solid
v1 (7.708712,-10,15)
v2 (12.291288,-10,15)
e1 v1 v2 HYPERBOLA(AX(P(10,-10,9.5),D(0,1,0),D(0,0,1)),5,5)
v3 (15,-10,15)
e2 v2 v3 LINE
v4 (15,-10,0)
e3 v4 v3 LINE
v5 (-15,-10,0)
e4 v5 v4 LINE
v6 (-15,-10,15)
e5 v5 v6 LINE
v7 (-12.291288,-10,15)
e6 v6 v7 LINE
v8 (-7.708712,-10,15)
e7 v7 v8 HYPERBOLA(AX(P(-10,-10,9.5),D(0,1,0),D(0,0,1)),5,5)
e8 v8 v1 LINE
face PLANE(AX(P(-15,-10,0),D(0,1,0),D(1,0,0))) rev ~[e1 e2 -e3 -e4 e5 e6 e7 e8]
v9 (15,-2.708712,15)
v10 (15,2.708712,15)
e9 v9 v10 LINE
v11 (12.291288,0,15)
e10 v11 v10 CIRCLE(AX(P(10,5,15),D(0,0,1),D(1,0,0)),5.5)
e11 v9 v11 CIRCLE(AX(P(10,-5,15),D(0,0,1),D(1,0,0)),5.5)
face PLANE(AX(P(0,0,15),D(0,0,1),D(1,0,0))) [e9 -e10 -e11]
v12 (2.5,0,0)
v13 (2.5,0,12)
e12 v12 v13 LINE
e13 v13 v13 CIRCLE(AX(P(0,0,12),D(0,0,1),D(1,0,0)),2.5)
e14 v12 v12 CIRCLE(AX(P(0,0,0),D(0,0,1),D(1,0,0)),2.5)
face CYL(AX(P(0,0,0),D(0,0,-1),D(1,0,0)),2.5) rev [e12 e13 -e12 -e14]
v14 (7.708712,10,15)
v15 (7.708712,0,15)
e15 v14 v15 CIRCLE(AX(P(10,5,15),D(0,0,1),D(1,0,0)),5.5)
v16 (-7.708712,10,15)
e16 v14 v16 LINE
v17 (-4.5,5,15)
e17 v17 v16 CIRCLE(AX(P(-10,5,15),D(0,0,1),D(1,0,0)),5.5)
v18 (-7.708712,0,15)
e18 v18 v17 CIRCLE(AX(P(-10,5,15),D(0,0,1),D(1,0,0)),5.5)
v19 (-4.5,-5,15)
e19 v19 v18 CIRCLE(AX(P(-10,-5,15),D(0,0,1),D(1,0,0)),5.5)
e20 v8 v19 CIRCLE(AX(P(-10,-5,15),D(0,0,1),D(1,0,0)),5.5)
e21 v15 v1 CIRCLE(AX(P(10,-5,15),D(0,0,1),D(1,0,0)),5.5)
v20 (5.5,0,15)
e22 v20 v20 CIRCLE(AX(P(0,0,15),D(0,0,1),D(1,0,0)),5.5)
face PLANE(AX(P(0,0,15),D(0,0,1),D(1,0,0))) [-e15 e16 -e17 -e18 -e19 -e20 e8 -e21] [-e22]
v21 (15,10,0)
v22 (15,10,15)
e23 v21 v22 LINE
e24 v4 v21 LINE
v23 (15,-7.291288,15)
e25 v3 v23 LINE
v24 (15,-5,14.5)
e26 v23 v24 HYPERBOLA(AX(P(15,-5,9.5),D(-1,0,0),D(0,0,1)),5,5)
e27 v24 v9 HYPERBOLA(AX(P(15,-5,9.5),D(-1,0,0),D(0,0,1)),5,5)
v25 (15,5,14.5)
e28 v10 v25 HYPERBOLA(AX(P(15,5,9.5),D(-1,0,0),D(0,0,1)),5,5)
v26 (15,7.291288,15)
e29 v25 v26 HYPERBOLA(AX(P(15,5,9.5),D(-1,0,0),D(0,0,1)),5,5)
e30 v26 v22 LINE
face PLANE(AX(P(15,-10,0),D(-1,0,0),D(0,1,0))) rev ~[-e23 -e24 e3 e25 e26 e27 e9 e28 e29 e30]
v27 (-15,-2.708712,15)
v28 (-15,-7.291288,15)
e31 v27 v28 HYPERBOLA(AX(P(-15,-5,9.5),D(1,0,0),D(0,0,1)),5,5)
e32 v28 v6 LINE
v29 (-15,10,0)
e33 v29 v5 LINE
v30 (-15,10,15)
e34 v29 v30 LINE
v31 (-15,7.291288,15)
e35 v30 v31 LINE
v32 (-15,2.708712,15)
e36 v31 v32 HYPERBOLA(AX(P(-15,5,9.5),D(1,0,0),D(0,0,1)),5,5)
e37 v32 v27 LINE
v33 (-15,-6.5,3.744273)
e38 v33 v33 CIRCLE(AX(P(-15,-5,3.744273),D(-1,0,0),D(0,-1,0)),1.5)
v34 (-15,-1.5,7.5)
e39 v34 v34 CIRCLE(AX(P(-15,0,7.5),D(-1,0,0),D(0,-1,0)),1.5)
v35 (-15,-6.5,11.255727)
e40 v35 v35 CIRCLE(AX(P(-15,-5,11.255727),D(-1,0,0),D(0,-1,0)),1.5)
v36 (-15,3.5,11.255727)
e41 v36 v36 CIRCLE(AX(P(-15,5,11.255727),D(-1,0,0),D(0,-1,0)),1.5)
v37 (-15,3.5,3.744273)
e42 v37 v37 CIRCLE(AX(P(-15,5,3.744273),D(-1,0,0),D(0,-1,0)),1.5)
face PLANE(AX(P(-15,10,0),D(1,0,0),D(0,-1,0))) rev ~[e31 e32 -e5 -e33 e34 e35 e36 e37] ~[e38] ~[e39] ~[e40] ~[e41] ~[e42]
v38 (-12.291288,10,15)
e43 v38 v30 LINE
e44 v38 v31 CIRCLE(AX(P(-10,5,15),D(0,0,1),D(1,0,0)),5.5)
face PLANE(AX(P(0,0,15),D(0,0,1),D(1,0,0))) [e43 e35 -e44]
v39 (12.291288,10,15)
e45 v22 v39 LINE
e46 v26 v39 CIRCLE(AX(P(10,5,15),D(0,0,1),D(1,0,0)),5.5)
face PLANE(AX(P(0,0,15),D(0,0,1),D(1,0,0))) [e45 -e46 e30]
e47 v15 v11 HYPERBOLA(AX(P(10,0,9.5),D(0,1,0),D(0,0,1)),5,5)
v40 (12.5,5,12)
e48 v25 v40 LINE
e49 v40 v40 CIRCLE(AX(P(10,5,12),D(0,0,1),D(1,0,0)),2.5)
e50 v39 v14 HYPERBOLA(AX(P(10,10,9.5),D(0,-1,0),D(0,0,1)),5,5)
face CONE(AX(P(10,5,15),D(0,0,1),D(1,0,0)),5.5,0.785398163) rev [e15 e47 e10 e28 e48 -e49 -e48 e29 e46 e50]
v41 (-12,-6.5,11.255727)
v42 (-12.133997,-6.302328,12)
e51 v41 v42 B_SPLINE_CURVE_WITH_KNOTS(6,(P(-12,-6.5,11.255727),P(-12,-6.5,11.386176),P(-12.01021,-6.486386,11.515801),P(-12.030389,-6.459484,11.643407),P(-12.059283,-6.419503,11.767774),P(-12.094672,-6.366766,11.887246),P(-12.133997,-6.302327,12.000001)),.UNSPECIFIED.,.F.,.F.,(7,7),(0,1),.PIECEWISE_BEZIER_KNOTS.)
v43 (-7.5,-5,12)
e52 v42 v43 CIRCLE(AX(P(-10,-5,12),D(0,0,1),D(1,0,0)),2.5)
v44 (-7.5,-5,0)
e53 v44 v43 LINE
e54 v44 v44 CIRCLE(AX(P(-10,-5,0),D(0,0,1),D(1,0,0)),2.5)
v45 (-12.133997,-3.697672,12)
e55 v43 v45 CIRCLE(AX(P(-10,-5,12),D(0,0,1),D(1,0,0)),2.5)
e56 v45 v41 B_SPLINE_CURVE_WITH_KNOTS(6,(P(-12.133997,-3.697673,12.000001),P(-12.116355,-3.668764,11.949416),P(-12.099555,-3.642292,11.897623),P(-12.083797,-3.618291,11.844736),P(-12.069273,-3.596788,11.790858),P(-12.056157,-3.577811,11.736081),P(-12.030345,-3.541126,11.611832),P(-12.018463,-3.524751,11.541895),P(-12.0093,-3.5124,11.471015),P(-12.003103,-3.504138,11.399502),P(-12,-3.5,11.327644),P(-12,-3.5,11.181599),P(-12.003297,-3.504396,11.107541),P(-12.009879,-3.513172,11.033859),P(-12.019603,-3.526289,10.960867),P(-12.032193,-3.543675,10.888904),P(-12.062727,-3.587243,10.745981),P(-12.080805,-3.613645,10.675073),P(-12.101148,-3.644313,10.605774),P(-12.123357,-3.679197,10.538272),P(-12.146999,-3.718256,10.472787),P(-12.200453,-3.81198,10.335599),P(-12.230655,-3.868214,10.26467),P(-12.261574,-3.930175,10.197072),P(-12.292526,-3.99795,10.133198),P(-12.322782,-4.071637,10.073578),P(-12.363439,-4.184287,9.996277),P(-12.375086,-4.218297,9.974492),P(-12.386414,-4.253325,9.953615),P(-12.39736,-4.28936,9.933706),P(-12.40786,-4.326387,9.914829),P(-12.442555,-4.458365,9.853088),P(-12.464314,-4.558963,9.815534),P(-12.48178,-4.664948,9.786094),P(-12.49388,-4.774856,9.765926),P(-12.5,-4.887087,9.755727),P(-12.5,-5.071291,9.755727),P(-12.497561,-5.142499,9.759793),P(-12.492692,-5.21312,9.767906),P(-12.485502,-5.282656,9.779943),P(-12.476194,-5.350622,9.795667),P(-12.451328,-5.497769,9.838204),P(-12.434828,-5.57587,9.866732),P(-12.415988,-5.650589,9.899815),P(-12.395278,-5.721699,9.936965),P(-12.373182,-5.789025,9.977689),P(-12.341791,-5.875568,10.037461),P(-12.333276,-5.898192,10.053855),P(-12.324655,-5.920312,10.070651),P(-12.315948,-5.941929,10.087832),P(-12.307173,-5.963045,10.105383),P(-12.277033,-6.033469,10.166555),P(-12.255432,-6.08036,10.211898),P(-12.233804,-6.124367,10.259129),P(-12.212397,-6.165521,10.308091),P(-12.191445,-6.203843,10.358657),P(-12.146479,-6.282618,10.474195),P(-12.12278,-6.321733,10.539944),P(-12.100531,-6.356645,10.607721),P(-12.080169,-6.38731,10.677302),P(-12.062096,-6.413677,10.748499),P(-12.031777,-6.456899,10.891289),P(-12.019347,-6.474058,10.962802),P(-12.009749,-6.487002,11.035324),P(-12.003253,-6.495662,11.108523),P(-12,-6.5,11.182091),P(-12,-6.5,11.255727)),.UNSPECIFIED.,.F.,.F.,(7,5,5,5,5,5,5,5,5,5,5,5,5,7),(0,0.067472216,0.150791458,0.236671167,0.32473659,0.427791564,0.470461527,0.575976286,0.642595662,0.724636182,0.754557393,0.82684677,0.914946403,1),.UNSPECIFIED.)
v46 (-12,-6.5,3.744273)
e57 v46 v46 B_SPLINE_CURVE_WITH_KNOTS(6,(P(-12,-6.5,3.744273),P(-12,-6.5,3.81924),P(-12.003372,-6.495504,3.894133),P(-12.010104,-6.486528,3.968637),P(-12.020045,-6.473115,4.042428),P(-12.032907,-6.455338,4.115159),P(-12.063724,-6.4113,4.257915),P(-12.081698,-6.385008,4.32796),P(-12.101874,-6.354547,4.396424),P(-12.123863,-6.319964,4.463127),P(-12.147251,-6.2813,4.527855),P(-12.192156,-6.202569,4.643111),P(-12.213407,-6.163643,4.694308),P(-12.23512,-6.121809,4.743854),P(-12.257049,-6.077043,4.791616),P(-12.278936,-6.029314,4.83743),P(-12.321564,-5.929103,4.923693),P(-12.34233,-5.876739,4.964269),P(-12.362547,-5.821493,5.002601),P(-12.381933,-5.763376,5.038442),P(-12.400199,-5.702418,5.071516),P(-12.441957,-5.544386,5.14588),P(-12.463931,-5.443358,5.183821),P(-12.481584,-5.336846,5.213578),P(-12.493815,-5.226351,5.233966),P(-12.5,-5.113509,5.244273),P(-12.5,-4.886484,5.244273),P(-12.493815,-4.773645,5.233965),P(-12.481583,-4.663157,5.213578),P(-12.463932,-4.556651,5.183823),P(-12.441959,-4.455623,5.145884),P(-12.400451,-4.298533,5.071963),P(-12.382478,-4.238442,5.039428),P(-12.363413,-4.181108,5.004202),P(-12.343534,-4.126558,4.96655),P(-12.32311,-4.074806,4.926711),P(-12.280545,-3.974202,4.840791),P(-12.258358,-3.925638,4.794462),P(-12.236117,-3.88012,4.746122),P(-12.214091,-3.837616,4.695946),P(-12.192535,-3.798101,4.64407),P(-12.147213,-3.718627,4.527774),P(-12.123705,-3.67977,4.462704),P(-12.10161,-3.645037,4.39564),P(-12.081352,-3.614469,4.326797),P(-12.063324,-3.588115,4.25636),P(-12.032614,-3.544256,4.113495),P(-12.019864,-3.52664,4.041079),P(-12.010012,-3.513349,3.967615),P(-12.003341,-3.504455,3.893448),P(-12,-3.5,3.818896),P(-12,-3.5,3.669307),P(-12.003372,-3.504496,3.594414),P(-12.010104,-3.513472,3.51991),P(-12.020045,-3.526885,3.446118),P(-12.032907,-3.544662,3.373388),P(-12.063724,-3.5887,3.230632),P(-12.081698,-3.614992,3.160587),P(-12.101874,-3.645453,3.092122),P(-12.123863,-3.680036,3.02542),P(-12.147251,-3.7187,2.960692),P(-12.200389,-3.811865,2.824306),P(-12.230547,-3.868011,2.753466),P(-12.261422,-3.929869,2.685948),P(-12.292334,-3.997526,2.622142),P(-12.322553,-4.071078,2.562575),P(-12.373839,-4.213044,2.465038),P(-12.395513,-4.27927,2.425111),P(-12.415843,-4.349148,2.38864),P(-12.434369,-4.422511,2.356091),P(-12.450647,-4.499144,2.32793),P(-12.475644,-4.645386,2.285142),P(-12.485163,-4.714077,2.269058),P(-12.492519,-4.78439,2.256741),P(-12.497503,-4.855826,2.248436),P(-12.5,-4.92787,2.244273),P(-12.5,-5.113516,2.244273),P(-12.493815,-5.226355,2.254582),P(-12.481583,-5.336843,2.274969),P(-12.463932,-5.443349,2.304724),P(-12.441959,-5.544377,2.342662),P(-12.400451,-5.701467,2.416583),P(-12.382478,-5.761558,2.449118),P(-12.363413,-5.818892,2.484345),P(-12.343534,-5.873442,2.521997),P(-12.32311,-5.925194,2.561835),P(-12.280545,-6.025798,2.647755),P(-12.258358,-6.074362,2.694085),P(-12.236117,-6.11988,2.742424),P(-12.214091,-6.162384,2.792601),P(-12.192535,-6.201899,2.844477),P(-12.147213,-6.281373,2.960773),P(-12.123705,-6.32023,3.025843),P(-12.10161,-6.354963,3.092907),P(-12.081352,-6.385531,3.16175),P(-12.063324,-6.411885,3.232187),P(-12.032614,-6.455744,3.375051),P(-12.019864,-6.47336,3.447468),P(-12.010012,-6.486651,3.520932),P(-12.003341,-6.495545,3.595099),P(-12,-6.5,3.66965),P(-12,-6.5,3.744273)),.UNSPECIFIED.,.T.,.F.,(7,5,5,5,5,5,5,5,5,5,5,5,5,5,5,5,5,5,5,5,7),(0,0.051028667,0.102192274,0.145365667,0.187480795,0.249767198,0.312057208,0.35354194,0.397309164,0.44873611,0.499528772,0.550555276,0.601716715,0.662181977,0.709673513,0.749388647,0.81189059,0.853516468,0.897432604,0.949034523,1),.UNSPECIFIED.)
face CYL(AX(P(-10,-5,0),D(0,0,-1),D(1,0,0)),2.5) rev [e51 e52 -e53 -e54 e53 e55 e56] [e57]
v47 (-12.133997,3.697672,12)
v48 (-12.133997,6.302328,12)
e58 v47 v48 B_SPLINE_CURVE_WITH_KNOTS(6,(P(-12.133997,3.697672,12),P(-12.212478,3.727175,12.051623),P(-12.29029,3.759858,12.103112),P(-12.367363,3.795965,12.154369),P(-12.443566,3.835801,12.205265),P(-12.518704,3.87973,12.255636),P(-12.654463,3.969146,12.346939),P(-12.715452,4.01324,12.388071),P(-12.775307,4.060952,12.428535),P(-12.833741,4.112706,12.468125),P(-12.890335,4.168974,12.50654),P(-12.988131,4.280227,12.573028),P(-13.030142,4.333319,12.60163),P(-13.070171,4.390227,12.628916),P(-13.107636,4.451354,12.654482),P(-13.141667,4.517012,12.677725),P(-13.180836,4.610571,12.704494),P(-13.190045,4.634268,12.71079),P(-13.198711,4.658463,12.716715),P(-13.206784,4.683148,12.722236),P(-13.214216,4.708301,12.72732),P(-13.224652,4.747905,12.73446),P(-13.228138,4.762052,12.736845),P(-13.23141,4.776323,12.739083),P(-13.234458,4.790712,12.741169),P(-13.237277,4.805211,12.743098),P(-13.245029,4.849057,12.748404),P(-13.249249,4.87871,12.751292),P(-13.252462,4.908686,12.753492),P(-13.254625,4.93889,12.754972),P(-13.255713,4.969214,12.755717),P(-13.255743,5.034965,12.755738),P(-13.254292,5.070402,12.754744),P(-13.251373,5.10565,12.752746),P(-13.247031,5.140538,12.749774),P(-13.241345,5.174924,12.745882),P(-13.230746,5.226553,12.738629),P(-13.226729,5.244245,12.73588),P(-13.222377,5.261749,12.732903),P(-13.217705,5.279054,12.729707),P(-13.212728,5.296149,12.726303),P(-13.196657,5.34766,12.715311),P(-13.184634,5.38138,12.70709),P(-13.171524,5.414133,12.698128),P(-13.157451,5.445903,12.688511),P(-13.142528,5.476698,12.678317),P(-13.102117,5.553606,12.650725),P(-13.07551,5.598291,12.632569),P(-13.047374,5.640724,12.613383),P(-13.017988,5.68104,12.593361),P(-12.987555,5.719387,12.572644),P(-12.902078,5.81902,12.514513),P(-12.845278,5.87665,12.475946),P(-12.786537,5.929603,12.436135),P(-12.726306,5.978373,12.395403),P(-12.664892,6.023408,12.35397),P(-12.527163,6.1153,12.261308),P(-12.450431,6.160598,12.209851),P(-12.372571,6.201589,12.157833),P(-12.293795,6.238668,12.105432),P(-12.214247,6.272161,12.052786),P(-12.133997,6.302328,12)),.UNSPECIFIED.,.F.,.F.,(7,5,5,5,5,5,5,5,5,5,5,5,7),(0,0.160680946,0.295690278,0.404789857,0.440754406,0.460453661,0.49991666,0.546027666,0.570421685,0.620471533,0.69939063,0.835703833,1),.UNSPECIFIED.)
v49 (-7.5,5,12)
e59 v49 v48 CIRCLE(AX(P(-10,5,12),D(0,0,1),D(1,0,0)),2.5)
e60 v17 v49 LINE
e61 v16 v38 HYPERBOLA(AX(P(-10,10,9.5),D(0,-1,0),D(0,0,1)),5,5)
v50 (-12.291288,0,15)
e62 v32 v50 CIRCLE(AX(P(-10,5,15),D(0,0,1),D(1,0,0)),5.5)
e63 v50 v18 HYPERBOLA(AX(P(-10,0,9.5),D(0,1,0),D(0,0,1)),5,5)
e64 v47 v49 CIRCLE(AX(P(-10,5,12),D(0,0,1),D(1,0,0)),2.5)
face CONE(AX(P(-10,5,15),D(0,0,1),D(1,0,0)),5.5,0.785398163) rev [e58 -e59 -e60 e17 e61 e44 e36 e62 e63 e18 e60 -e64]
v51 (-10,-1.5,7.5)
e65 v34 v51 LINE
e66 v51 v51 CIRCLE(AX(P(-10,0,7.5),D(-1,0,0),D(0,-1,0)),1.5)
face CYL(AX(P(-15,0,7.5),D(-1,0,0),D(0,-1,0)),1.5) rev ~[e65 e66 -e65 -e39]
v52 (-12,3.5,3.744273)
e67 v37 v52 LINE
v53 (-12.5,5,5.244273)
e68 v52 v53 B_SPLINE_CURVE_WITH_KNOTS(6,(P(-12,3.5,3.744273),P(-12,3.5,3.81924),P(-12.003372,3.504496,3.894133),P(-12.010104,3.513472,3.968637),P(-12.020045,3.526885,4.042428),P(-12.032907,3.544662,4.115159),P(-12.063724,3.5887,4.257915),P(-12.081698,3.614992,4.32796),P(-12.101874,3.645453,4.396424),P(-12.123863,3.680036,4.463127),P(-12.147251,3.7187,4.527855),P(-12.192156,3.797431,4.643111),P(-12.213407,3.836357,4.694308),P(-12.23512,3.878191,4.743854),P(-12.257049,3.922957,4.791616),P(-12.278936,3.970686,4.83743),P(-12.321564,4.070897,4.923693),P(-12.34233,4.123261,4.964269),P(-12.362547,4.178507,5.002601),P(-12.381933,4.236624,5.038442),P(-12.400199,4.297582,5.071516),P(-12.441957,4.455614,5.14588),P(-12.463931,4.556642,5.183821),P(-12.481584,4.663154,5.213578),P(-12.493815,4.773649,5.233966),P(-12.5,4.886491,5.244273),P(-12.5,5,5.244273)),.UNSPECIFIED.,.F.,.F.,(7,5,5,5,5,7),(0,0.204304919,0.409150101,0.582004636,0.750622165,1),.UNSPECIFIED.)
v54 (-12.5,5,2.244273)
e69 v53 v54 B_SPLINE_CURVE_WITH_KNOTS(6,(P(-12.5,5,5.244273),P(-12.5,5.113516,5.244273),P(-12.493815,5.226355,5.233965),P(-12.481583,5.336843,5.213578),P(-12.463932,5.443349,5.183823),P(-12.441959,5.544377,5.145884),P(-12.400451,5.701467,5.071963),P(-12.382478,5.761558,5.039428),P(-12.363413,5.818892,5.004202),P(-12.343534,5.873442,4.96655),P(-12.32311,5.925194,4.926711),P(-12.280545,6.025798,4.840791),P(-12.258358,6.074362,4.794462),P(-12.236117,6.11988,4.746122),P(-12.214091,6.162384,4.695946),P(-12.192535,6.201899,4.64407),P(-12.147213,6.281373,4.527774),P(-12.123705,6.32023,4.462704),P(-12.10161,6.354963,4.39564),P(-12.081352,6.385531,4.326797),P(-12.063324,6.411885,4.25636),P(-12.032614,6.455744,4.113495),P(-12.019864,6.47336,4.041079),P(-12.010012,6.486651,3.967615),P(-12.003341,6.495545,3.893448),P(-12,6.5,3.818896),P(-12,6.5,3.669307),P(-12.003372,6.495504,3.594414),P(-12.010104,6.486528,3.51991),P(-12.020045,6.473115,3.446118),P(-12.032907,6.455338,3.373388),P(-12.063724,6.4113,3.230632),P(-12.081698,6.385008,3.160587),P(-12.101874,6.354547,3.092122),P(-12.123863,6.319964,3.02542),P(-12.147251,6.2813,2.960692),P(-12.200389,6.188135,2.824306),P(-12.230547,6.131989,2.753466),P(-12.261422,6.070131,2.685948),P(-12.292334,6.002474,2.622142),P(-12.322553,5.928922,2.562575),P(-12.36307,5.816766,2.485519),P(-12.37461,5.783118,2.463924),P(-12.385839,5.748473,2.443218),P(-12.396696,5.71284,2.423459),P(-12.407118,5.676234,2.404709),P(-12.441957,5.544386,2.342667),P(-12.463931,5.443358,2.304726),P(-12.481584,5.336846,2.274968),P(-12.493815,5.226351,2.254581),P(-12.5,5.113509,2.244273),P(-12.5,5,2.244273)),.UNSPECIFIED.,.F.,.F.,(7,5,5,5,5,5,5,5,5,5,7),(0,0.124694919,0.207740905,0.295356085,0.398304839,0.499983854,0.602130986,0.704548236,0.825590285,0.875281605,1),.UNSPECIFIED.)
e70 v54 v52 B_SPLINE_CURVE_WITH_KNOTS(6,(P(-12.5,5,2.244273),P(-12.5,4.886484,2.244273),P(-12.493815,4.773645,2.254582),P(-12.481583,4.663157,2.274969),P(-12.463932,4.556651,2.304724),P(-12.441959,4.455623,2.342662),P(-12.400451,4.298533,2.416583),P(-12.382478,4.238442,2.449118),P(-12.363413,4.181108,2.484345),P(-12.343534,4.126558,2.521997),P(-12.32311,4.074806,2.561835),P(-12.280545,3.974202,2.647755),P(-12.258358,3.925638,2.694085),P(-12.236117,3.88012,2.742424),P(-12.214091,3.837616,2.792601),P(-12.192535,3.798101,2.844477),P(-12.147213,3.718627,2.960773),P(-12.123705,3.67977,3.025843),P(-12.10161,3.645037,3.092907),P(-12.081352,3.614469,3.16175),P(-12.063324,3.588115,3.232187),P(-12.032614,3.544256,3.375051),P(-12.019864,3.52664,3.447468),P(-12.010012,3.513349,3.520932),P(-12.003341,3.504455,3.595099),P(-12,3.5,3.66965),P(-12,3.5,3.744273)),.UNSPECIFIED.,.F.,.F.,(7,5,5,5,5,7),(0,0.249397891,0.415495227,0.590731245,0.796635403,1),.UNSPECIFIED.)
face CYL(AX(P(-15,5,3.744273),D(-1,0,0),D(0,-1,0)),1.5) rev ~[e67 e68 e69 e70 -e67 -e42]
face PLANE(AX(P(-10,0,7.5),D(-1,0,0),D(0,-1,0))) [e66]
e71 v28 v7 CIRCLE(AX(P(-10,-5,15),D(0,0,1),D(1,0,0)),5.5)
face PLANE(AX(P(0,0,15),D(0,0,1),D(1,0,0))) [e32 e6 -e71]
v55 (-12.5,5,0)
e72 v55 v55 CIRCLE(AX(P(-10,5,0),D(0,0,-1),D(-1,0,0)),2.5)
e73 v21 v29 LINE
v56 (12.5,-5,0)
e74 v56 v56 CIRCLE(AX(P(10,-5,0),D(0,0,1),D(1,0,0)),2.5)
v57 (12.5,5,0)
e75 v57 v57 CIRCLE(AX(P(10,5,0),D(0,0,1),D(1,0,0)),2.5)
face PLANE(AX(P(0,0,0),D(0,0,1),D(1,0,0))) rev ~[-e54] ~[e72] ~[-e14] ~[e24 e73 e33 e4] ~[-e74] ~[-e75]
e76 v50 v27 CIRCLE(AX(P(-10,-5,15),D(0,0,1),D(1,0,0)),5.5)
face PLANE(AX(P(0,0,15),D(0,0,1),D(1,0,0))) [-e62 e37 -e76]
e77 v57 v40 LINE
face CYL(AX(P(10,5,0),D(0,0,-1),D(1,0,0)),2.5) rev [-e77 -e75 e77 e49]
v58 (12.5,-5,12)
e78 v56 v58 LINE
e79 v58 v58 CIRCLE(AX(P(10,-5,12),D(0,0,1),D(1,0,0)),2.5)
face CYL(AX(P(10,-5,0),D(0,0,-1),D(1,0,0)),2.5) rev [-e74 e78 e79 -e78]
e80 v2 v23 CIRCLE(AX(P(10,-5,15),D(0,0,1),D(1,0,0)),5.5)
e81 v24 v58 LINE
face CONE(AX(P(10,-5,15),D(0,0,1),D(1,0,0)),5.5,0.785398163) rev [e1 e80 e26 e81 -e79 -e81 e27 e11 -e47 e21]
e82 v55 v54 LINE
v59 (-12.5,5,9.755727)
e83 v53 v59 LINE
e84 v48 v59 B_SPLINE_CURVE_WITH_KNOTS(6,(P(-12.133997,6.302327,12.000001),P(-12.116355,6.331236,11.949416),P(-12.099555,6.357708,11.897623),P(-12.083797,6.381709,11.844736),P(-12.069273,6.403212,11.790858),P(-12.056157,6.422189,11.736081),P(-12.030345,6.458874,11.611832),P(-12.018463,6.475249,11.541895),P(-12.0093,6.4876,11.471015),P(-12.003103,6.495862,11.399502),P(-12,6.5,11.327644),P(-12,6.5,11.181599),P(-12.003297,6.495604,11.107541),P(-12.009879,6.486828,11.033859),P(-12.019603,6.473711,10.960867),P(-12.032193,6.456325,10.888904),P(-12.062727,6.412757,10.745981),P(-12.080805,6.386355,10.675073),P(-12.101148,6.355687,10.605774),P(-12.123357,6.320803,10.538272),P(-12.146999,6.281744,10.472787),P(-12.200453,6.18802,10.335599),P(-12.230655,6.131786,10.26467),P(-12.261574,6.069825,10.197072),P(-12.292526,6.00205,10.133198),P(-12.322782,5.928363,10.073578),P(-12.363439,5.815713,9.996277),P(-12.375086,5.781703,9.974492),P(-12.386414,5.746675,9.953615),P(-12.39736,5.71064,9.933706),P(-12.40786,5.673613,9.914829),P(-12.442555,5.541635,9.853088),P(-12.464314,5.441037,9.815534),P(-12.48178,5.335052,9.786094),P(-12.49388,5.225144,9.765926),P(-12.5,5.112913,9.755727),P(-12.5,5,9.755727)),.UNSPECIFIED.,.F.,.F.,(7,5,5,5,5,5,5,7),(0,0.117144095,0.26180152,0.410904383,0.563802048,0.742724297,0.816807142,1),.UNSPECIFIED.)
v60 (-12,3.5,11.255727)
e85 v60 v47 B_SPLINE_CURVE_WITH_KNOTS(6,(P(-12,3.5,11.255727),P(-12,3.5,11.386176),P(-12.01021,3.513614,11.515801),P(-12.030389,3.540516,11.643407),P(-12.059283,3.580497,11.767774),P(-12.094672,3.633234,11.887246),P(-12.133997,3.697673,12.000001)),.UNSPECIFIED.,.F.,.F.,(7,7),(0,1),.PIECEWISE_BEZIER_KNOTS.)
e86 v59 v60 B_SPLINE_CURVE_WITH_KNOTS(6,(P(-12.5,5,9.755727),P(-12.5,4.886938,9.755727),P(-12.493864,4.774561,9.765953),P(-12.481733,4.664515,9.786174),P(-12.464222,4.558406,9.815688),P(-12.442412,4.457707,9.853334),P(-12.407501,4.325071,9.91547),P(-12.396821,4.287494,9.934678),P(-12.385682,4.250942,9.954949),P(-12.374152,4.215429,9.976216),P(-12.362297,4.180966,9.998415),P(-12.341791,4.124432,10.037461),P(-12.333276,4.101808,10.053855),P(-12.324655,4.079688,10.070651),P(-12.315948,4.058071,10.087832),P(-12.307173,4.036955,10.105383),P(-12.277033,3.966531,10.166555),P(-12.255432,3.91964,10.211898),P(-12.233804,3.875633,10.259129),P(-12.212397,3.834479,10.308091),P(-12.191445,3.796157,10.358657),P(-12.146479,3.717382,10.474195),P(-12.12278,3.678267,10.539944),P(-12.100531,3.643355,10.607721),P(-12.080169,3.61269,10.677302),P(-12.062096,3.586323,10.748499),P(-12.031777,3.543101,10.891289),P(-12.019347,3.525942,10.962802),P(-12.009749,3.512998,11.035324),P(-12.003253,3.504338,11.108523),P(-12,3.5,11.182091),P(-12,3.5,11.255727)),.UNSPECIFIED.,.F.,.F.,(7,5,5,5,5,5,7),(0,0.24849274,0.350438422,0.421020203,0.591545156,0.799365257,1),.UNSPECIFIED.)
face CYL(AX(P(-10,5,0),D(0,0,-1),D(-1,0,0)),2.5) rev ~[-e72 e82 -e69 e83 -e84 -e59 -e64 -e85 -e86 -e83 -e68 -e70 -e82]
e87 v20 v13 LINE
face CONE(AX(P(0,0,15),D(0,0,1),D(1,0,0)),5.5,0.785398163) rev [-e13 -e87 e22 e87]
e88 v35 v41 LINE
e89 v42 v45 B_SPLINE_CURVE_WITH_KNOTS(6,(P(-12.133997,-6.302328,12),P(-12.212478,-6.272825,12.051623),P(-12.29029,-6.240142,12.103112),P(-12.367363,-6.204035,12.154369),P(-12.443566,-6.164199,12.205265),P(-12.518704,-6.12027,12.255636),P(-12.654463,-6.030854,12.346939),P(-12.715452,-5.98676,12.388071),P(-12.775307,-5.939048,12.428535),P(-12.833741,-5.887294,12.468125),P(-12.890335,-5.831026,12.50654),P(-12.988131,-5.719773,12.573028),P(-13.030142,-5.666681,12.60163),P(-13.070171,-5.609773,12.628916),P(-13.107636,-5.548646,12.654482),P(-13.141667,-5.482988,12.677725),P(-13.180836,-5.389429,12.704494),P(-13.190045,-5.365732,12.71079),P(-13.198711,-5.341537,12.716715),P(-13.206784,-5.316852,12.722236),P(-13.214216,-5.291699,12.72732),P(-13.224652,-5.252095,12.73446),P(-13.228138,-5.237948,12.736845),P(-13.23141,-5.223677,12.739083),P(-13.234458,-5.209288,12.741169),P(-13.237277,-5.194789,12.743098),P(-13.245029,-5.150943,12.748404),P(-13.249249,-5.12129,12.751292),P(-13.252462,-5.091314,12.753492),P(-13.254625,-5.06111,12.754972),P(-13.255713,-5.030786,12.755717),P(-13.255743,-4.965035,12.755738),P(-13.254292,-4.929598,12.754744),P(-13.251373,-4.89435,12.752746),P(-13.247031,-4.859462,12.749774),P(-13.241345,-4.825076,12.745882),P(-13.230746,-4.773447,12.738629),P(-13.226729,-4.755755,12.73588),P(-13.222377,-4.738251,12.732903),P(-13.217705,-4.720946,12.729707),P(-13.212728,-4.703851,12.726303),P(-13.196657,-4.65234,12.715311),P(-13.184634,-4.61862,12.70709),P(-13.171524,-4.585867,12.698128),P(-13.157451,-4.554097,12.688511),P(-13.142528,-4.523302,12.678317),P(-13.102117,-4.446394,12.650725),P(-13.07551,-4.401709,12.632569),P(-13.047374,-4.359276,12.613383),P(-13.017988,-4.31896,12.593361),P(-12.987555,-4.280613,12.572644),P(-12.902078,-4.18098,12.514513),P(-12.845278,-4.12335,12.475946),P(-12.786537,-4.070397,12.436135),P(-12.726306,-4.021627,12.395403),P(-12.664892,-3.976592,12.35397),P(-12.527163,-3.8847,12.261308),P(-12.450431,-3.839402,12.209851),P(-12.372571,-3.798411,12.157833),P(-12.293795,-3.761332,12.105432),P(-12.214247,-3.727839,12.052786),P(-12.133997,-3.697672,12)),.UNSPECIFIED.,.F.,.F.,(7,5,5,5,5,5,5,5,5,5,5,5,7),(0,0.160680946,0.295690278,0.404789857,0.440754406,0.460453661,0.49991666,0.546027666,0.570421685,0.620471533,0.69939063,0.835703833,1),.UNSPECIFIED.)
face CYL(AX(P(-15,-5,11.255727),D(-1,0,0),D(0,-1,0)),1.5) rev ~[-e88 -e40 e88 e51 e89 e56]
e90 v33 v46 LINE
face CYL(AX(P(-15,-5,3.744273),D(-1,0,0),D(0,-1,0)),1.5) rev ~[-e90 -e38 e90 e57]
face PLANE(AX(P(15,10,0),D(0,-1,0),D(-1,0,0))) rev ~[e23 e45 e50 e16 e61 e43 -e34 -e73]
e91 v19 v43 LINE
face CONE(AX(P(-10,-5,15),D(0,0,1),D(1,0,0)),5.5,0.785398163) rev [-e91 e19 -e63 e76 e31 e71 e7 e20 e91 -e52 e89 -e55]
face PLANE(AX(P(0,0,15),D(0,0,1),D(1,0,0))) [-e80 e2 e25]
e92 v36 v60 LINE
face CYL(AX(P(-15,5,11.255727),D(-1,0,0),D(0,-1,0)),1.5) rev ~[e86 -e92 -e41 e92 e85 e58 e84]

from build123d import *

# Parameters (mm, degrees)
F0_R     = 2.5
F1_DEPTH = 15
F3_R     = 1.5
F4_DEPTH = 5


# Not quite as in the source:
# - a fillet or chamfer that OpenCascade refuses, or shapes differently, is made with other operations: its cross-section is extruded or revolved along the edge and cut away or added


with BuildPart() as f1:
    # F0 (on Top) → F1 (new body)
    with BuildSketch(Plane.XY):
        Polygon((-5, 10), (-15, 10), (-15, 5), (-15, -10), (15, -10), (15, 10), align=None)
        with Locations((-10, -5)):
            Circle(F0_R, mode=Mode.SUBTRACT)
        with Locations((10, -5)):
            Circle(F0_R, mode=Mode.SUBTRACT)
        with BuildLine():
            ThreePointArc((-7.5, 5), (-10, 2.5), (-12.5, 5))
            ThreePointArc((-12.5, 5), (-10, 7.5), (-7.5, 5))
        make_face(mode=Mode.SUBTRACT)
        Circle(F0_R, mode=Mode.SUBTRACT)
        with Locations((10, 5)):
            Circle(F0_R, mode=Mode.SUBTRACT)
    extrude(amount=F1_DEPTH)

    # F2: chamfer of 3 on 5 edges, made by hand

    # F2_s1 → F2_t2 (revolve, cut)
    with BuildSketch(Plane.XZ.offset(-5)):
        Polygon((-4.5, 15), (-7.5, 12), (-7.5, 15), align=None)
    revolve(axis=Axis((-10, 5, 15), (0, 0, 1)), mode=Mode.SUBTRACT)

    # F2_s3 → F2_t4 (revolve, cut)
    with BuildSketch(Plane.XZ):
        Polygon((5.5, 15), (2.5, 12), (2.5, 15), align=None)
    revolve(axis=Axis((0, 0, 15), (0, 0, 1)), mode=Mode.SUBTRACT)

    # F2_s5 → F2_t6 (revolve, cut)
    with BuildSketch(Plane.XZ.offset(5)):
        Polygon((-4.5, 15), (-7.5, 12), (-7.5, 15), align=None)
    revolve(axis=Axis((-10, -5, 15), (0, 0, 1)), mode=Mode.SUBTRACT)

    # F2_s7 → F2_t8 (revolve, cut)
    with BuildSketch(Plane.XZ.offset(-5)):
        Polygon((15.5, 15), (12.5, 12), (12.5, 15), align=None)
    revolve(axis=Axis((10, 5, 15), (0, 0, 1)), mode=Mode.SUBTRACT)

    # F2_s9 → F2_t10 (revolve, cut)
    with BuildSketch(Plane.XZ.offset(5)):
        Polygon((15.5, 15), (12.5, 12), (12.5, 15), align=None)
    revolve(axis=Axis((10, -5, 15), (0, 0, 1)), mode=Mode.SUBTRACT)

    # F3 (on face) → F4 (cut)
    with BuildSketch(Plane(origin=(-15, 0, 0), x_dir=(0, -1, 0), z_dir=(-1, 0, 0))):
        with Locations((0, 7.5)):
            Circle(F3_R)
        with Locations((-5, 11.2557266839)):
            Circle(F3_R)
        with Locations((-5, 3.7442733161)):
            Circle(F3_R)
        with Locations((5, 11.2557266839)):
            Circle(F3_R)
        with Locations((5, 3.7442733161)):
            Circle(F3_R)
    extrude(amount=-F4_DEPTH, mode=Mode.SUBTRACT)


solid = f1.part
